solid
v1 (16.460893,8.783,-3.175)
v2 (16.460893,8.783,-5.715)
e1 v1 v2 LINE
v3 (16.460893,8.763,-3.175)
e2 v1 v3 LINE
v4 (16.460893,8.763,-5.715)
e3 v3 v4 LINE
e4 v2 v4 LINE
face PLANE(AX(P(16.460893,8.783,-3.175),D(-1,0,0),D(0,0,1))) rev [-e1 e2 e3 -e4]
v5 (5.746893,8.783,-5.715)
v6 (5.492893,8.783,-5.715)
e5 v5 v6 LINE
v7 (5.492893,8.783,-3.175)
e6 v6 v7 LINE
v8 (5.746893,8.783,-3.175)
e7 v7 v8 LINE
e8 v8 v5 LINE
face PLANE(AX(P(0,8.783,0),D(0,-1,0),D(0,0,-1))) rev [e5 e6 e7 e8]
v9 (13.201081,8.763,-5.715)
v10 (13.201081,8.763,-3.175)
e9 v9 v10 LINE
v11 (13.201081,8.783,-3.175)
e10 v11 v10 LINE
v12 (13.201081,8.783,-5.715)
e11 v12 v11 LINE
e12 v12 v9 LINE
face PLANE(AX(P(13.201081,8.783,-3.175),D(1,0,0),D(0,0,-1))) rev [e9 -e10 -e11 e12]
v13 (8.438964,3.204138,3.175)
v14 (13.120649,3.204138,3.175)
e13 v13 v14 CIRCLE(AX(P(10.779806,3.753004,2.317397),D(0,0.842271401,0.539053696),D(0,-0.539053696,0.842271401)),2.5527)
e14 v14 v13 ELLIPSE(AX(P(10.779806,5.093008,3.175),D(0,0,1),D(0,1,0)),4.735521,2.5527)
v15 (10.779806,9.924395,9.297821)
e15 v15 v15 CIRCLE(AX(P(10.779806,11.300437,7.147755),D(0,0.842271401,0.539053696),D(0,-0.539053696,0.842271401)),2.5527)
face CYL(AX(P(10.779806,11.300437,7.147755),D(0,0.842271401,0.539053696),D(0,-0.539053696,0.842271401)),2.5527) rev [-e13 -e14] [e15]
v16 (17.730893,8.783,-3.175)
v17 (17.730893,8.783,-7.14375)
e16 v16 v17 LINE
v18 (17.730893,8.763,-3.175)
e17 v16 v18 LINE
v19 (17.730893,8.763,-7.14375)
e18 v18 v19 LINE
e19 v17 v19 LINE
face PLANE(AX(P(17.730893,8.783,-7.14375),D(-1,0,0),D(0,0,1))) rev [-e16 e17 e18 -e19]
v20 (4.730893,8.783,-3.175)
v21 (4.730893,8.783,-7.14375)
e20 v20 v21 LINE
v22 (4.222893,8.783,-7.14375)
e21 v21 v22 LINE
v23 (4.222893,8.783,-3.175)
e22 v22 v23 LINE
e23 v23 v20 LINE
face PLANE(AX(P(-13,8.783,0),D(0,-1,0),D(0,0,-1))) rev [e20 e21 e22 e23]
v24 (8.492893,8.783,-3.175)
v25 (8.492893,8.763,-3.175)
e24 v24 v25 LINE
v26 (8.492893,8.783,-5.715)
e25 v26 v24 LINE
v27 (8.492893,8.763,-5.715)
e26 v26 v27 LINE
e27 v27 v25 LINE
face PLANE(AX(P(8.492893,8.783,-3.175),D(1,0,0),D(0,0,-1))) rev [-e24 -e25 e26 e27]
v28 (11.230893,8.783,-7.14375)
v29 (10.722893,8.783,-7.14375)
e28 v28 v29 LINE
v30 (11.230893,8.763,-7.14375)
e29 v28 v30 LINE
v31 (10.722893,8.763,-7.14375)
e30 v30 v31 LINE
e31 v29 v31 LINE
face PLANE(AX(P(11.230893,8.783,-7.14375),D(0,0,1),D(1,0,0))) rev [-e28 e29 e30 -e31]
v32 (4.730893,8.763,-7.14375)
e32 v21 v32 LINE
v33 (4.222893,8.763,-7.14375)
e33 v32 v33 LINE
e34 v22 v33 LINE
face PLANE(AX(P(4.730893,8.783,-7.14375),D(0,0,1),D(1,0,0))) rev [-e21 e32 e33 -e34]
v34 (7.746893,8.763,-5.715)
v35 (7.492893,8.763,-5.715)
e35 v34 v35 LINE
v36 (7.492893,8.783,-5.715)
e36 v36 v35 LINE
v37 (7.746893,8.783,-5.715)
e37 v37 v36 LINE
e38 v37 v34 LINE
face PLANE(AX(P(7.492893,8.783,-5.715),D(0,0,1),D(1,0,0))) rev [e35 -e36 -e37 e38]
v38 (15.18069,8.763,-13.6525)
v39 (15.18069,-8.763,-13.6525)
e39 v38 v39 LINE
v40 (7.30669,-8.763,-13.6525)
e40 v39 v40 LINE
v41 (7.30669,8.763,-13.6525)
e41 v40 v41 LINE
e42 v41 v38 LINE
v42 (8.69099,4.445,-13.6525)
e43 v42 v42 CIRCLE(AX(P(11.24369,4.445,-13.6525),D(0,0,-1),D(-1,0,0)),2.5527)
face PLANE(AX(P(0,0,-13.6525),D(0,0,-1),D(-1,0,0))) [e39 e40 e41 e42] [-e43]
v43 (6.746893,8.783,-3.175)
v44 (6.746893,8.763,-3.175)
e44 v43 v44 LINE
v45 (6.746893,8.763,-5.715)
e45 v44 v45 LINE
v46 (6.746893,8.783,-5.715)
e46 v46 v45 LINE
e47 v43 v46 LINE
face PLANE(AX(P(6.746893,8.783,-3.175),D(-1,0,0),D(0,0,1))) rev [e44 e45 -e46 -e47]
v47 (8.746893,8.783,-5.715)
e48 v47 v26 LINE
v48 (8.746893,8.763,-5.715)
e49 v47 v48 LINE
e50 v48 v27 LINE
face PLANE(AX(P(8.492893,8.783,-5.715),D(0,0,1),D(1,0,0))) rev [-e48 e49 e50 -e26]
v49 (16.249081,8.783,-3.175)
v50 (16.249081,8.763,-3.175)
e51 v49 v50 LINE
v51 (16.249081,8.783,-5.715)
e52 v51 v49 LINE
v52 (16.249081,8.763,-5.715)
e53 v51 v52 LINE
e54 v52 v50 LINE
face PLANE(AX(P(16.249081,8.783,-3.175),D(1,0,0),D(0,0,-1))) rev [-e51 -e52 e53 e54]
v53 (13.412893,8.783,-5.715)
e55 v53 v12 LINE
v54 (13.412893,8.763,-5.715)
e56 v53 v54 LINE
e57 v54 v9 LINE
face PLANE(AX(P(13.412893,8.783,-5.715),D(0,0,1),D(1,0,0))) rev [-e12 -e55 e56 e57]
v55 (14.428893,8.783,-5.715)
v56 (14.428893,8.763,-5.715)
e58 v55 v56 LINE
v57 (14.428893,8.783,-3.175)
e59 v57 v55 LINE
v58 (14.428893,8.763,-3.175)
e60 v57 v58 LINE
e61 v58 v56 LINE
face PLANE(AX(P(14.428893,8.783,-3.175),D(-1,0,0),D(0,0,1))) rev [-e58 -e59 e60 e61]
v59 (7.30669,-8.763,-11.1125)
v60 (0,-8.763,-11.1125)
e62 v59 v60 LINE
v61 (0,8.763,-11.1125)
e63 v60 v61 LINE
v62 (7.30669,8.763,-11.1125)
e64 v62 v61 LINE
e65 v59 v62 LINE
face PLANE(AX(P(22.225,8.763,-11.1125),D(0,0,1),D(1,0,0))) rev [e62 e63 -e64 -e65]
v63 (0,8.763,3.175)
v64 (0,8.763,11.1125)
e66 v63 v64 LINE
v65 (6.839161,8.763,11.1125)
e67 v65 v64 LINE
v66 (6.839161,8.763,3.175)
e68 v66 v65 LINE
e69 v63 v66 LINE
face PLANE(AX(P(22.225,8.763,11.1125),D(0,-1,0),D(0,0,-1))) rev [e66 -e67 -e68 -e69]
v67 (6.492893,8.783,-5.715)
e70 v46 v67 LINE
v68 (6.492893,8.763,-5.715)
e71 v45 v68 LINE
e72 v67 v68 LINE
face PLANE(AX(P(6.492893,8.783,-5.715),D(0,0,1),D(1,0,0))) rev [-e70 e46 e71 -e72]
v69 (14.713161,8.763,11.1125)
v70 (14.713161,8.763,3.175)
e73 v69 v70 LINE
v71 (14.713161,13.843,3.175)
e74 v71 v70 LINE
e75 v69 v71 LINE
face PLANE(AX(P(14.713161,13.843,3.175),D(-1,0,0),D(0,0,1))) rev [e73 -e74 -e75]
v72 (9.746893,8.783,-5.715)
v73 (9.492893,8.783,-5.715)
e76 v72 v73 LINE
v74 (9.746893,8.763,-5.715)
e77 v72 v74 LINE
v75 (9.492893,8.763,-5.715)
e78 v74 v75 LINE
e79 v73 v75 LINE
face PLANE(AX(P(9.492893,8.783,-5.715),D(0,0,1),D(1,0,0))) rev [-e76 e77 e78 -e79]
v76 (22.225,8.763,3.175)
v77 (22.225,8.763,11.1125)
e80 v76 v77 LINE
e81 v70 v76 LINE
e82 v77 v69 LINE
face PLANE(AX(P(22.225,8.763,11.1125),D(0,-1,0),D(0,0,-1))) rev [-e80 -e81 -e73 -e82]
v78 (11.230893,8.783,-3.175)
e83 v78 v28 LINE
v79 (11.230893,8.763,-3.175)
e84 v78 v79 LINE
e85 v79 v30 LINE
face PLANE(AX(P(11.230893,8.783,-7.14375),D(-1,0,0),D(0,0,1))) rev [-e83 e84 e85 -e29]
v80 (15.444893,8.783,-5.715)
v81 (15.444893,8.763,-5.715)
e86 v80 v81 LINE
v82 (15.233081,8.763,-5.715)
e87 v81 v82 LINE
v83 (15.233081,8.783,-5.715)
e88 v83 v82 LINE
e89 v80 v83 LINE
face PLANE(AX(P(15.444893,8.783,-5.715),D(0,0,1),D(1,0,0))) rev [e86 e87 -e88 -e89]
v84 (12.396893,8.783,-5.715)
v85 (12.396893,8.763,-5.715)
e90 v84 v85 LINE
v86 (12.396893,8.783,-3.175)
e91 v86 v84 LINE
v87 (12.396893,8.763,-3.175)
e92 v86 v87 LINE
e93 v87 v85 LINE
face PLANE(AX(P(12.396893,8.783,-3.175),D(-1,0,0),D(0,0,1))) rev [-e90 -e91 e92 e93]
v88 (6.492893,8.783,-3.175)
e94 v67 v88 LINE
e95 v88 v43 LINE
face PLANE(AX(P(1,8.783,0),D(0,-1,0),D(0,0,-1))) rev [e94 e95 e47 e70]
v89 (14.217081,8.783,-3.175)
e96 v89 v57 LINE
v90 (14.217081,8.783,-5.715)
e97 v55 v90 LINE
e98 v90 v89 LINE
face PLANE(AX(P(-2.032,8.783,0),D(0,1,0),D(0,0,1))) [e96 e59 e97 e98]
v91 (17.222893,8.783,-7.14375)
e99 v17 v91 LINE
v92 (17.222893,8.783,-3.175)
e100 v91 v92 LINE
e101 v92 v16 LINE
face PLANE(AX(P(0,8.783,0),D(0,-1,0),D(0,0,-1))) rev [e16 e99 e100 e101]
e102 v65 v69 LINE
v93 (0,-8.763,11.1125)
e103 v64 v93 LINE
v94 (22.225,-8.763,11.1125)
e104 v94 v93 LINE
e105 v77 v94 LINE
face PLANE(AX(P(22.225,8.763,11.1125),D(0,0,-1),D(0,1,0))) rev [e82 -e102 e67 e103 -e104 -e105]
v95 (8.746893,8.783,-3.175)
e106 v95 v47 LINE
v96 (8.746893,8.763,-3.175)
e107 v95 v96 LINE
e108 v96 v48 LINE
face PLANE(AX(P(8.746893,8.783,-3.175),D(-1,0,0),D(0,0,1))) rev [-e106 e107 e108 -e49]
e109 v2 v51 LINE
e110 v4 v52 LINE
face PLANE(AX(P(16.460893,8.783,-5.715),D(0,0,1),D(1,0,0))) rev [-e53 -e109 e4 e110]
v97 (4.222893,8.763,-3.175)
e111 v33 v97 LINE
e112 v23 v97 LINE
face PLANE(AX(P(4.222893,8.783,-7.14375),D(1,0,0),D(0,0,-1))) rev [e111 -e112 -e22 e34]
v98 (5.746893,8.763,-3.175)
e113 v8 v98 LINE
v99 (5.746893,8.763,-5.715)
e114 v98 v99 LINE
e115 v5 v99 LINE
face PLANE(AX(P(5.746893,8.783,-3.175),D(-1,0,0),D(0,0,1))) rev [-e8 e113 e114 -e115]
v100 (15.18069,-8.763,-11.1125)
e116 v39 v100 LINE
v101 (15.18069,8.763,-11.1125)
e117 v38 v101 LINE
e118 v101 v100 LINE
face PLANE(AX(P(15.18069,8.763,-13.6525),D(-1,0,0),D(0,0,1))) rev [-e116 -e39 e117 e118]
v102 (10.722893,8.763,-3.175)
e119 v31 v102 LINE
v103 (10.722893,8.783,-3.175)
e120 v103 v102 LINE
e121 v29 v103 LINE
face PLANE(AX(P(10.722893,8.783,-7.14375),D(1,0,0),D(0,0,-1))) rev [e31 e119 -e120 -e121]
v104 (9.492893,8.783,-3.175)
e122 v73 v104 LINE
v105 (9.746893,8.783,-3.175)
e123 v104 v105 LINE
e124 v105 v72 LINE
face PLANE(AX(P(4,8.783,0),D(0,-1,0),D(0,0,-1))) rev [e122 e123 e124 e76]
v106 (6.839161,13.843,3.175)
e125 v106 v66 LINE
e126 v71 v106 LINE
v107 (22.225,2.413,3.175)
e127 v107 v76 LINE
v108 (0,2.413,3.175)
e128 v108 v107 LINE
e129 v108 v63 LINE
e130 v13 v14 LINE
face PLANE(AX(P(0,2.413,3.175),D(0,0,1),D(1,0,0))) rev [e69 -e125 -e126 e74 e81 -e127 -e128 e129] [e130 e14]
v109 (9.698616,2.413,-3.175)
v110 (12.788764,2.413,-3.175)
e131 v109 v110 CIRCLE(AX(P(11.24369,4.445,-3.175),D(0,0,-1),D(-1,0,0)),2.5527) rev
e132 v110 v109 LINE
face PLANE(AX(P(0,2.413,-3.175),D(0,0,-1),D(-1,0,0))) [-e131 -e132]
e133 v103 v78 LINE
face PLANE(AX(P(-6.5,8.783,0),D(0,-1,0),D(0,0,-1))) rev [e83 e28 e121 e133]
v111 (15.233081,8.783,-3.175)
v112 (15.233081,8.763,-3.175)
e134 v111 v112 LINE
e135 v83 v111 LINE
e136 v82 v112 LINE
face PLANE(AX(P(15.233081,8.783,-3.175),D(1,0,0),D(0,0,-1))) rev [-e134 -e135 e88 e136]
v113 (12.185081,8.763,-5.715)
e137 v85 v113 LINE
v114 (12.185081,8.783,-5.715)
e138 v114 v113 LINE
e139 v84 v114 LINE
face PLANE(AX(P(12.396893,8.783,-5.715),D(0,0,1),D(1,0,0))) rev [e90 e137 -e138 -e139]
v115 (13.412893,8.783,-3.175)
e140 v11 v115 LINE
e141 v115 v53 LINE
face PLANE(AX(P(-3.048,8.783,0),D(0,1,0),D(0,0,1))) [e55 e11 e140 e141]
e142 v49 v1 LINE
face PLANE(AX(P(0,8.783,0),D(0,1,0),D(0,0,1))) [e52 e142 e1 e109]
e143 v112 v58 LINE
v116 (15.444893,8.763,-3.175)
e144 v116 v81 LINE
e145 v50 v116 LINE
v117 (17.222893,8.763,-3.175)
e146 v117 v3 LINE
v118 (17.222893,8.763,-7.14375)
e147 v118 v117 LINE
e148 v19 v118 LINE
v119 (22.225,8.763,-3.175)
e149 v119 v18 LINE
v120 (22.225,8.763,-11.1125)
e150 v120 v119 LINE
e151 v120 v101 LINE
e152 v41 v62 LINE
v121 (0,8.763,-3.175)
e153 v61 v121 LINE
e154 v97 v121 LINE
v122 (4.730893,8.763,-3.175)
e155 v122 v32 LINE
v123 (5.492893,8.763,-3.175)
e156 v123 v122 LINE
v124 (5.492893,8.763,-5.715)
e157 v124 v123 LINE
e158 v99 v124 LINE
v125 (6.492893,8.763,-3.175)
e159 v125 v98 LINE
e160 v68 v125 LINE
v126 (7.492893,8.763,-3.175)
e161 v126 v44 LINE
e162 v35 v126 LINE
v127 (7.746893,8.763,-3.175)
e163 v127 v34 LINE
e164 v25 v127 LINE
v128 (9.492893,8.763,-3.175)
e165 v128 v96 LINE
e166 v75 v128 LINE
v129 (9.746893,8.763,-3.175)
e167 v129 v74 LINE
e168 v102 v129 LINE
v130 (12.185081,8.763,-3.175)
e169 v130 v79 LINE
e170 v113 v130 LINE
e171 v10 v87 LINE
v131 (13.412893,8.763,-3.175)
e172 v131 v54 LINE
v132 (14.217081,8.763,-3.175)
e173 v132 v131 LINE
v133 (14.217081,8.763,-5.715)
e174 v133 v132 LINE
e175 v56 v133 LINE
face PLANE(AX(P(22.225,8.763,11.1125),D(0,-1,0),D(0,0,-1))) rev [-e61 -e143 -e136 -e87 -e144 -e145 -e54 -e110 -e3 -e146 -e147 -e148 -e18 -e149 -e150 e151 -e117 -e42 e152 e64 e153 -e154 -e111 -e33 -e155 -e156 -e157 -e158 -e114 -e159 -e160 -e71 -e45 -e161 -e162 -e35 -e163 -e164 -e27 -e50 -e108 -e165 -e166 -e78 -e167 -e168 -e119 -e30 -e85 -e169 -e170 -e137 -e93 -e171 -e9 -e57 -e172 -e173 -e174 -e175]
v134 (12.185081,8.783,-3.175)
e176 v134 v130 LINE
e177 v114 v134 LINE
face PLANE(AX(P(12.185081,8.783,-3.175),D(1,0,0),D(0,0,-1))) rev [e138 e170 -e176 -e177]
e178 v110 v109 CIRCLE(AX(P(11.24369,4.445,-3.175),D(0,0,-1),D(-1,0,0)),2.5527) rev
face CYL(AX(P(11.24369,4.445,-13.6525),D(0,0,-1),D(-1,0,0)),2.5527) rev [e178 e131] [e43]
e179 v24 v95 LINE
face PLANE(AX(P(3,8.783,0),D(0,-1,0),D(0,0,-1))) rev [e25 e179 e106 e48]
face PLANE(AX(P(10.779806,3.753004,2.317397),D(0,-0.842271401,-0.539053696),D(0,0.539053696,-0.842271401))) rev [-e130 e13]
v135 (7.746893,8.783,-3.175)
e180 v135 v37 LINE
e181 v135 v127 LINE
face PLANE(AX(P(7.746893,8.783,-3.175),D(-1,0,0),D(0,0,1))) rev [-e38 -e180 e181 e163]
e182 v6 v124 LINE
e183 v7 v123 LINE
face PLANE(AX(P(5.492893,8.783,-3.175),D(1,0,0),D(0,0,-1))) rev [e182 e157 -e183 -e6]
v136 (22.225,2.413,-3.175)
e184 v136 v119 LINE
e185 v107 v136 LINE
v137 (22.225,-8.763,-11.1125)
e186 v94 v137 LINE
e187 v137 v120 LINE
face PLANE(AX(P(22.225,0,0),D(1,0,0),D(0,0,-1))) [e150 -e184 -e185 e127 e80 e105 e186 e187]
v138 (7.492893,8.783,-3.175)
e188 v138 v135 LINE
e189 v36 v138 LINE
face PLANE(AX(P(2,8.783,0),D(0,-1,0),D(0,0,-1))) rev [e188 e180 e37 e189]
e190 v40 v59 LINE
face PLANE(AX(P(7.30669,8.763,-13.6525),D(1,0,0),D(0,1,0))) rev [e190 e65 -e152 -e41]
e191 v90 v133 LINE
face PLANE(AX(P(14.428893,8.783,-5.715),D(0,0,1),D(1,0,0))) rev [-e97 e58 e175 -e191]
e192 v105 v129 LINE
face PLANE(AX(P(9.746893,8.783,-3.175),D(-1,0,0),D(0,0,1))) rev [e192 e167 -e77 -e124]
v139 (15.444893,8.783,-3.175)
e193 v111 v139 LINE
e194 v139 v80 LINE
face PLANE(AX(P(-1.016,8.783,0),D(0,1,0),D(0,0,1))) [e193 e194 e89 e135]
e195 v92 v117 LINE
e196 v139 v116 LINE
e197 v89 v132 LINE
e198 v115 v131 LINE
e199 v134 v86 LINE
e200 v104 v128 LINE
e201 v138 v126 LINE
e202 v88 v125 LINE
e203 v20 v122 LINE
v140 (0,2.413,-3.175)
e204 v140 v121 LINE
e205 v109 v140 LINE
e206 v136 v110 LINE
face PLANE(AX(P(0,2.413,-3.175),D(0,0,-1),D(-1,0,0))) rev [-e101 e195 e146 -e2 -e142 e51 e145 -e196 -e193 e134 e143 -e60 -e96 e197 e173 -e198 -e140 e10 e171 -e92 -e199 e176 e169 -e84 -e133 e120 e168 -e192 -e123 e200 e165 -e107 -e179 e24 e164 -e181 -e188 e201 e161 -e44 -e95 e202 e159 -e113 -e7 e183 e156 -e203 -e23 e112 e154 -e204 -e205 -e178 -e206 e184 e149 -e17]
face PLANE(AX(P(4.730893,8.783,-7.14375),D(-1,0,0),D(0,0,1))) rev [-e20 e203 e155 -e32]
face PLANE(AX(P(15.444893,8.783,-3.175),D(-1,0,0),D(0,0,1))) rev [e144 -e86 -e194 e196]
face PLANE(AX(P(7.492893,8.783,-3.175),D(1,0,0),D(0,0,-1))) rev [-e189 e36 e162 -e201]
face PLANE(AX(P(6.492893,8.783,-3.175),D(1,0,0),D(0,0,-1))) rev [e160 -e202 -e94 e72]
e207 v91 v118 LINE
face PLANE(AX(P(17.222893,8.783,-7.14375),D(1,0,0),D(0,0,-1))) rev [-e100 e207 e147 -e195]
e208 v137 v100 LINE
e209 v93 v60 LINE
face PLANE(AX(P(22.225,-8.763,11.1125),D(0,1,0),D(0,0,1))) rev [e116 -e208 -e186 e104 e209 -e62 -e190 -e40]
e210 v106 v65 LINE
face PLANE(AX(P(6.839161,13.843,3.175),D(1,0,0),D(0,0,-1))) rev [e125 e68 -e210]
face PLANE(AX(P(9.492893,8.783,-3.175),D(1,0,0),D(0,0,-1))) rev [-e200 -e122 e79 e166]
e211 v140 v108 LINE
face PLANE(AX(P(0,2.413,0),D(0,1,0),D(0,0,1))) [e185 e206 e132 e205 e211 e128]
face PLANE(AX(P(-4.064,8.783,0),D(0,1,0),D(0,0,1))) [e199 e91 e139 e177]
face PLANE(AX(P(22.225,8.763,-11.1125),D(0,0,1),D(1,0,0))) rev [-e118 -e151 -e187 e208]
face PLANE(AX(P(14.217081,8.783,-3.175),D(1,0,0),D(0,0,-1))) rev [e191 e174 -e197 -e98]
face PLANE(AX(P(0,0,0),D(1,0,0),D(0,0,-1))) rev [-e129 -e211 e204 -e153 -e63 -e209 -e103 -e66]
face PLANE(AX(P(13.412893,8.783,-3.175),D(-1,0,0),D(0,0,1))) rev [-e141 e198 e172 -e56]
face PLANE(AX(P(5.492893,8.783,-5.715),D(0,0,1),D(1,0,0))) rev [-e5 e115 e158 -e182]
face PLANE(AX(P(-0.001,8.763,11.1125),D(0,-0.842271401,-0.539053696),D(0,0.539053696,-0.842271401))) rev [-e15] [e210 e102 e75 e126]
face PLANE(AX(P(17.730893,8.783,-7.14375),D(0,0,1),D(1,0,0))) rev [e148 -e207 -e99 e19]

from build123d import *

# Parameters (mm, degrees)
SKETCH1_W                       = 22.225
SKETCH1_H                       = 17.526
BOSS_EXTRUDE1_DEPTH             = 22.225
SKETCH2_W                       = 7.874
SKETCH2_H                       = 17.526
BOSS_EXTRUDE2_DEPTH             = 2.54
SKETCH3_W                       = 22.225
SKETCH3_H                       = 6.35
CUT_EXTRUDE1_DEPTH              = 6.35
SKETCH5_W                       = 7.874
SKETCH5_H                       = 7.9375
BOSS_EXTRUDE3_DEPTH             = 5.08
F_1_4_20_START                  = -13.6525
F_1_4_20_TAPPED_HOLE1_OUTLINE_R = 2.5527
F_1_4_20_TAPPED_HOLE1_DEPTH     = 10.4775
CUT_EXTRUDE3_REACH              = 26.382
F_1_4_20_START_2                = 4.410249561
F_1_4_20_TAPPED_HOLE2_OUTLINE_R = 2.5527
F_1_4_20_TAPPED_HOLE2_DEPTH     = 8.960808925
SKETCH21_W                      = 0.508
SKETCH21_H                      = 3.96875
BOSS_EXTRUDE4_DEPTH             = 0.02
LPATTERN1_COUNT                 = 3
LPATTERN1_PITCH                 = 6.5
SKETCH22_W                      = 0.211811424
SKETCH22_H                      = 2.54
BOSS_EXTRUDE5_DEPTH             = 0.02
LPATTERN2_COUNT                 = 5
LPATTERN2_PITCH                 = 1.016
SKETCH23_W                      = 0.254
SKETCH23_H                      = 2.54
BOSS_EXTRUDE6_DEPTH             = 0.02
LPATTERN3_COUNT                 = 5
LPATTERN3_PITCH                 = 1


# Read off the part's stored shape, not the designer's step: 1/4-20 Tapped Hole1, 1/4-20 Tapped Hole2
with BuildPart() as part:
    # Sketch1 → Boss-Extrude1 (new body)
    with BuildSketch(Plane(origin=(0, 0, 0), x_dir=(0, 0, -1), z_dir=(1, 0, 0))):
        Rectangle(SKETCH1_W, SKETCH1_H)
    extrude(amount=BOSS_EXTRUDE1_DEPTH)

    # Sketch2 → Boss-Extrude2 (add)
    with BuildSketch(Plane(origin=(0, 0, -11.1125), x_dir=(-1, 0, 0), z_dir=(0, 0, -1))):
        with Locations((-11.243689687, 0)):
            Rectangle(SKETCH2_W, SKETCH2_H)
    extrude(amount=BOSS_EXTRUDE2_DEPTH)

    # Sketch3 → Cut-Extrude1 (cut)
    with BuildSketch(Plane(origin=(0, 8.763, 0), x_dir=(1, 0, 0), z_dir=(0, 1, 0))):
        with Locations((11.1125, 0)):
            Rectangle(SKETCH3_W, SKETCH3_H)
    extrude(amount=-CUT_EXTRUDE1_DEPTH, mode=Mode.SUBTRACT)

    # Sketch5 → Boss-Extrude3 (add)
    with BuildSketch(Plane(origin=(0, 8.763, 0), x_dir=(1, 0, 0), z_dir=(0, 1, 0))):
        with Locations((10.776161326, -7.14375)):
            Rectangle(SKETCH5_W, SKETCH5_H)
    extrude(amount=BOSS_EXTRUDE3_DEPTH)

    # 1/4-20 Tapped Hole1 outline → 1/4-20 Tapped Hole1 (cut)
    with BuildSketch(Plane.XY.offset(F_1_4_20_START)):
        with Locations((11.243689687, 4.445)):
            Circle(F_1_4_20_TAPPED_HOLE1_OUTLINE_R)
    extrude(amount=F_1_4_20_TAPPED_HOLE1_DEPTH, mode=Mode.SUBTRACT)

    # Sketch6 → Cut-Extrude3 (cut, up to next)
    with BuildSketch(Plane(origin=(14.713161326, 0, 0), x_dir=(0, 0, -1), z_dir=(1, 0, 0)), mode=Mode.PRIVATE) as cut_extrude3_sk1:
        Polygon((-11.1125, 8.763), (-3.175, 13.843), (-11.1125, 13.843), align=None)
    cut_extrude3_tool1 = extrude(cut_extrude3_sk1.sketch, amount=-CUT_EXTRUDE3_REACH, mode=Mode.PRIVATE) & part.part
    add(cut_extrude3_tool1.solids().sort_by_distance((14.713161, 12.149667, 8.466667))[0], mode=Mode.SUBTRACT)

    # 1/4-20 Tapped Hole2 outline → 1/4-20 Tapped Hole2 (cut)
    with BuildSketch(Plane(origin=(0, 0, 0), x_dir=(1, 0, 0), z_dir=(0, 0.842271400661511, 0.539053696423368)).offset(F_1_4_20_START_2)):
        with Locations((10.779806469, 0.071193023)):
            Circle(F_1_4_20_TAPPED_HOLE2_OUTLINE_R)
    extrude(amount=F_1_4_20_TAPPED_HOLE2_DEPTH, mode=Mode.SUBTRACT)

    # Sketch21 → Boss-Extrude4 (add)
    with BuildSketch(Plane(origin=(0, 8.763, 0), x_dir=(1, 0, 0), z_dir=(0, 1, 0))):
        with Locations((17.4768928, 5.159375)):
            Rectangle(SKETCH21_W, SKETCH21_H)
    boss_extrude4 = extrude(amount=BOSS_EXTRUDE4_DEPTH)

    # LPattern1: Boss-Extrude4 ×3
    with Locations(*[(-i * LPATTERN1_PITCH, 0, 0) for i in range(1, LPATTERN1_COUNT)]):
        add(boss_extrude4)

    # Sketch22 → Boss-Extrude5 (add)
    with BuildSketch(Plane(origin=(0, 8.763, 0), x_dir=(1, 0, 0), z_dir=(0, 1, 0))):
        with Locations((16.354987088, 4.445)):
            Rectangle(SKETCH22_W, SKETCH22_H)
    boss_extrude5 = extrude(amount=BOSS_EXTRUDE5_DEPTH)

    # LPattern2: Boss-Extrude5 ×5
    with Locations(*[(-i * LPATTERN2_PITCH, 0, 0) for i in range(1, LPATTERN2_COUNT)]):
        add(boss_extrude5)

    # Sketch23 → Boss-Extrude6 (add)
    with BuildSketch(Plane(origin=(0, 8.763, 0), x_dir=(1, 0, 0), z_dir=(0, 1, 0))):
        with Locations((5.6198928, 4.445)):
            Rectangle(SKETCH23_W, SKETCH23_H)
    boss_extrude6 = extrude(amount=BOSS_EXTRUDE6_DEPTH)

    # LPattern3: Boss-Extrude6 ×5
    with Locations(*[(i * LPATTERN3_PITCH, 0, 0) for i in range(1, LPATTERN3_COUNT)]):
        add(boss_extrude6)


solid = part.part
